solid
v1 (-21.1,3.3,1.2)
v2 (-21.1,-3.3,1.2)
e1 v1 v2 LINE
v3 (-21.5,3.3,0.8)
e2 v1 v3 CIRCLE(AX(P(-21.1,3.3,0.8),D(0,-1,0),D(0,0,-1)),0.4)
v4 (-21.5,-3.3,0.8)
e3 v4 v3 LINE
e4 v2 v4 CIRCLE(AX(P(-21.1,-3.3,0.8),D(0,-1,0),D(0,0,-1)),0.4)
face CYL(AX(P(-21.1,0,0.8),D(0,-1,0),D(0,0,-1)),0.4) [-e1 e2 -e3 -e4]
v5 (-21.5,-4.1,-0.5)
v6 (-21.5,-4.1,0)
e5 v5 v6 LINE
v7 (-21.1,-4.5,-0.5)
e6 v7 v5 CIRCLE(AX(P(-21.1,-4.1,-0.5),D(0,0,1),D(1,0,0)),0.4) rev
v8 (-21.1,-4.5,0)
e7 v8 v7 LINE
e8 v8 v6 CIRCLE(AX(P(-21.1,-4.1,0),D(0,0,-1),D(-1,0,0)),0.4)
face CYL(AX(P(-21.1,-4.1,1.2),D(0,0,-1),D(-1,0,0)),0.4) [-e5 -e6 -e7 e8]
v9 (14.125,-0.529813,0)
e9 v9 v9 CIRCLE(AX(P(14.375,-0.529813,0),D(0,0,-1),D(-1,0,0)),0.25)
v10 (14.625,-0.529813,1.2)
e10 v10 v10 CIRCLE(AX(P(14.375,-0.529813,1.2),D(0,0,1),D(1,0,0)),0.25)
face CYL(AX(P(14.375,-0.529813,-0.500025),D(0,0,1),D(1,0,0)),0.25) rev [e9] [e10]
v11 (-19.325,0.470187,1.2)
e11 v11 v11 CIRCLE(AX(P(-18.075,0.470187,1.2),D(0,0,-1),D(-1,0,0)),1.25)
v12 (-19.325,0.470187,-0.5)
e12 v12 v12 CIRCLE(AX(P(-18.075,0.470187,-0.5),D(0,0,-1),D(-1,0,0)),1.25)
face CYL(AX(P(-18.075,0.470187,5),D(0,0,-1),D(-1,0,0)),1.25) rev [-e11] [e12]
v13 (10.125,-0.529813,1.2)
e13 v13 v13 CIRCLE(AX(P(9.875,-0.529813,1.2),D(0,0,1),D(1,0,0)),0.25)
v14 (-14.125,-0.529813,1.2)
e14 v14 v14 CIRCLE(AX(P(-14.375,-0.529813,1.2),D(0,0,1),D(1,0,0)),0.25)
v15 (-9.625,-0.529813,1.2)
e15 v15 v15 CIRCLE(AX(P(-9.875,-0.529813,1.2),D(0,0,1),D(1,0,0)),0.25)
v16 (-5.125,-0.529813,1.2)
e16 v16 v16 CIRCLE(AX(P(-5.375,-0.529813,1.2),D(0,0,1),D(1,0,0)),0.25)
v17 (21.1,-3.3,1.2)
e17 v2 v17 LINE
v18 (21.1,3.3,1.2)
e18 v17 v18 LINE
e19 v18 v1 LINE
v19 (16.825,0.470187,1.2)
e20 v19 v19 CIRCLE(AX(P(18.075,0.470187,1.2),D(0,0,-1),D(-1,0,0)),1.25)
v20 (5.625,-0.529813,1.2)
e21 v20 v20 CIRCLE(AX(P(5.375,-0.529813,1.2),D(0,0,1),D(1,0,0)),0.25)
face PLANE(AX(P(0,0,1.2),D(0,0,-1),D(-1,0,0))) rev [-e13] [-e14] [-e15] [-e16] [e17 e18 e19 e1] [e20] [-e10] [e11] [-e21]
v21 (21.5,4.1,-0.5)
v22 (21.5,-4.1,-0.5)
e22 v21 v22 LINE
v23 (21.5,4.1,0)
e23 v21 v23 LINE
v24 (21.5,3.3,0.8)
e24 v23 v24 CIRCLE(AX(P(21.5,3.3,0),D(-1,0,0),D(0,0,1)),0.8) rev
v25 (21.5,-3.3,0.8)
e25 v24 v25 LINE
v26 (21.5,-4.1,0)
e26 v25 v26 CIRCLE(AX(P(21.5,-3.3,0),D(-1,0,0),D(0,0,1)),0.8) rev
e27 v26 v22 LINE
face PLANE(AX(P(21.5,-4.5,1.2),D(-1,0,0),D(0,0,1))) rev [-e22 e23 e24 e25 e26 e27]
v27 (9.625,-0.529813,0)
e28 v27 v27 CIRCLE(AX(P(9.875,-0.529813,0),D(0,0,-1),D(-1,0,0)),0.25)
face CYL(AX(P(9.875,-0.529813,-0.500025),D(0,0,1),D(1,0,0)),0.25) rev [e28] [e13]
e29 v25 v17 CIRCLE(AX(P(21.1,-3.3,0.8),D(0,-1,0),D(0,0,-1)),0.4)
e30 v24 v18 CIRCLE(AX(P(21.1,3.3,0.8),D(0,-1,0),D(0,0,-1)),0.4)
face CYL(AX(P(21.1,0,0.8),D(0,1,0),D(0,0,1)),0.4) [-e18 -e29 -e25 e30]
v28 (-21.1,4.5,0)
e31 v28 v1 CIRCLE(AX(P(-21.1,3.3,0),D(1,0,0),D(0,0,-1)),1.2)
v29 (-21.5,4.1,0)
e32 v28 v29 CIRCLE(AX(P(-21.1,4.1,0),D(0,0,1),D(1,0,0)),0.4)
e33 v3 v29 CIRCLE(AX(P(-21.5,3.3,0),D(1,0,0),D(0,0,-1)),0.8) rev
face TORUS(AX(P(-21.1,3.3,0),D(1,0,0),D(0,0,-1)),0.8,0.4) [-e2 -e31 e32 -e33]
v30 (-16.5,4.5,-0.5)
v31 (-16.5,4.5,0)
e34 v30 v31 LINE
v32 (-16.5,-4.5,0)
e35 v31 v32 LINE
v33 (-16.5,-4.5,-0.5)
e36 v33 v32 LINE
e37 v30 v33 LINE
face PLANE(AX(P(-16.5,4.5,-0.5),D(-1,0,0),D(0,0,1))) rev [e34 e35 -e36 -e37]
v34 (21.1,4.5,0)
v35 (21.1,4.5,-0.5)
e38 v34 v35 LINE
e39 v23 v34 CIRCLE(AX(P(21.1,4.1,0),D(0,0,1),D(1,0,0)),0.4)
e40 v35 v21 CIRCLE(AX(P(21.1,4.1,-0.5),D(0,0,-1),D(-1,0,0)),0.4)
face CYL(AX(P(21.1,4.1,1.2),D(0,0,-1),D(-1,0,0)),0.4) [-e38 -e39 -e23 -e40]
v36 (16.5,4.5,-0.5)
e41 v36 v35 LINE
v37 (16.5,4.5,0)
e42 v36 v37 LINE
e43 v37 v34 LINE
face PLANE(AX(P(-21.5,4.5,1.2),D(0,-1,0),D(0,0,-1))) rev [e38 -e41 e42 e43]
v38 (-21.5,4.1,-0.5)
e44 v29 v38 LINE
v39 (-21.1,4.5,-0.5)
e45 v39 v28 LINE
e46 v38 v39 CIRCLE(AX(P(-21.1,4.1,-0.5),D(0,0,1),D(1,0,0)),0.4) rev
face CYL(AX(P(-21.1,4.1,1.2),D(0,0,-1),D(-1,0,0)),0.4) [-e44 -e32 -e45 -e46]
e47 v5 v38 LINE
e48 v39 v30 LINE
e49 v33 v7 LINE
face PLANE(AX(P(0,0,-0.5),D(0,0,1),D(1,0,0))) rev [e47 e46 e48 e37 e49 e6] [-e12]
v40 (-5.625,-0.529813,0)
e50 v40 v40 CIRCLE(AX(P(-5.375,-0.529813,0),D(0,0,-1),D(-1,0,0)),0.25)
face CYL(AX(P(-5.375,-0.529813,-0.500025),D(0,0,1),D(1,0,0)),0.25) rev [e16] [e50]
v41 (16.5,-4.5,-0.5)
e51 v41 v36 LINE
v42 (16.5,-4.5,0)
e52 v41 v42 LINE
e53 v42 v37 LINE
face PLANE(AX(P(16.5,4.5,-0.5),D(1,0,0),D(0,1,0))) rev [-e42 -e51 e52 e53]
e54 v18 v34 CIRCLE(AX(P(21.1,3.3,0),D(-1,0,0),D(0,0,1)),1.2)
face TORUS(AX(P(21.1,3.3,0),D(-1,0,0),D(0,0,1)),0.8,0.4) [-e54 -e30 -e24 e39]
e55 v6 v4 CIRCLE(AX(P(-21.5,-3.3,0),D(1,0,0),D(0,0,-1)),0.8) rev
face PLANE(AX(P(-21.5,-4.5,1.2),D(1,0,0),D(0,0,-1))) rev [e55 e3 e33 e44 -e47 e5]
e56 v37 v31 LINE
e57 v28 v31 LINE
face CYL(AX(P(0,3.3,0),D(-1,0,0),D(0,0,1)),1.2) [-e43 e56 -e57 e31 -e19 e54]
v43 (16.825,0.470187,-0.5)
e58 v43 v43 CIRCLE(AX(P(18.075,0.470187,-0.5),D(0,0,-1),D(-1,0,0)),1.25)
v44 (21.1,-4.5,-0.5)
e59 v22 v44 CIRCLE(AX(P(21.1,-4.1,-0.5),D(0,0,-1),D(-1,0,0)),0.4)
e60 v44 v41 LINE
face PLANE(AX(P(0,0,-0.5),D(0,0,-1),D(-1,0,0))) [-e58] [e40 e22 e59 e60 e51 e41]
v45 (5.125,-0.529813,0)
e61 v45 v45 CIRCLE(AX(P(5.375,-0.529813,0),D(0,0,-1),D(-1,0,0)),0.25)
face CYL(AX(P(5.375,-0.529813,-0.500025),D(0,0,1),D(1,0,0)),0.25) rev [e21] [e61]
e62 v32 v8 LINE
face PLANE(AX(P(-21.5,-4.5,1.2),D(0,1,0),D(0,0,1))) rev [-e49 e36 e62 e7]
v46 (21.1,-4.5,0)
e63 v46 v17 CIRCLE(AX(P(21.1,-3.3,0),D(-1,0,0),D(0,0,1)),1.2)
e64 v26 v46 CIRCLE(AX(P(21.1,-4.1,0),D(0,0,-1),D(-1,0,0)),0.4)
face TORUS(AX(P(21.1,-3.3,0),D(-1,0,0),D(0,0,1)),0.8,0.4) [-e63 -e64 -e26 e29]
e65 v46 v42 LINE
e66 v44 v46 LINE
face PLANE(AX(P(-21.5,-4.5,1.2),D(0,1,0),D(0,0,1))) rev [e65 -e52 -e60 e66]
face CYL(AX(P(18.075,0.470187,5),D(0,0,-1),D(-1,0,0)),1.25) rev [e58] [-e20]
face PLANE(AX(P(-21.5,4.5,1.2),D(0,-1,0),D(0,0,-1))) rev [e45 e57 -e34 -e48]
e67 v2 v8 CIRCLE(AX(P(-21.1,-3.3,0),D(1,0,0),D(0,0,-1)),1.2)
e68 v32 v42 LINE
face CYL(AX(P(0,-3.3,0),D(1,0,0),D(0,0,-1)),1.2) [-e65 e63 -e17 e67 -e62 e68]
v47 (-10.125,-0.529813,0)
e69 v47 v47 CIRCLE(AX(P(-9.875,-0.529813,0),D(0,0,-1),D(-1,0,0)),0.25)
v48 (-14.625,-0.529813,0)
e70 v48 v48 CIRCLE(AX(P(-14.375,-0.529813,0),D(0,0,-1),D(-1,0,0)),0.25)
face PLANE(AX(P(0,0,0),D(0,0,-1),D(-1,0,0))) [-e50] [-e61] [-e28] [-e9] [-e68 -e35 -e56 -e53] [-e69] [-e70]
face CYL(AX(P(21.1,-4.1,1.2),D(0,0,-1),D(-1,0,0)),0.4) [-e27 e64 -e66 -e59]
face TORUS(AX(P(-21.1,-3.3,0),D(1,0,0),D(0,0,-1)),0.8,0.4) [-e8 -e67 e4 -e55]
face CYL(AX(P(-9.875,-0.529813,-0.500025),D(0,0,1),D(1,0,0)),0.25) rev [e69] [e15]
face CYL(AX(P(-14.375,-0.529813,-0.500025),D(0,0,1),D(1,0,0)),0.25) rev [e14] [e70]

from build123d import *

# Parameters (mm, degrees)
ESBO_O1_W                = 43
ESBO_O1_H                = 9
RESSALTO_EXTRUS_O1_DEPTH = 1.2
ESBO_O4_W                = 5
ESBO_O4_H                = 9
RESSALTO_EXTRUS_O4_DEPTH = 0.5
FILETE1_R                = 1.2
FILETE2_R                = 1.2
ESBO_O6_R                = 1.25
CORTE_EXTRUS_O2_DEPTH    = 5.5
FILETE3_R                = 0.4
FILETE4_R                = 0.4
ESBO_O7_R                = 0.25
CORTE_EXTRUS_O3_DEPTH    = 23.031568281


with BuildPart() as part:
    # Esboço1 → Ressalto-extrusão1 (new body)
    with BuildSketch(Plane.XY):
        Rectangle(ESBO_O1_W, ESBO_O1_H)
    extrude(amount=RESSALTO_EXTRUS_O1_DEPTH)

    # Esboço4 → Ressalto-extrusão4 (add)
    with BuildSketch(Plane(origin=(0, 0, 0), x_dir=(-1, 0, 0), z_dir=(0, 0, -1))):
        with Locations((19, 0)):
            Rectangle(ESBO_O4_W, ESBO_O4_H)
        with Locations((-19, 0)):
            Rectangle(ESBO_O4_W, ESBO_O4_H)
    extrude(amount=RESSALTO_EXTRUS_O4_DEPTH)

    # Filete1
    filete1_edges = [part.edges().sort_by_distance(p)[0] for p in [
        (0, 4.5, 1.2),
    ]]
    fillet(filete1_edges, radius=FILETE1_R - 0.0001)  # a hair under: the kernel refuses the full size

    # Filete2
    filete2_edges = [part.edges().sort_by_distance(p)[0] for p in [
        (0, -4.5, 1.2),
    ]]
    fillet(filete2_edges, radius=FILETE2_R - 0.0001)  # a hair under: the kernel refuses the full size

    # Esboço6 → Corte-extrusão2 (cut)
    with BuildSketch(Plane(origin=(0, 0, -0.5), x_dir=(-1, 0, 0), z_dir=(0, 0, -1))):
        with Locations((-18.075, 0.470186795)):
            Circle(ESBO_O6_R)
        with Locations((18.075, 0.470186795)):
            Circle(ESBO_O6_R)
    extrude(amount=-CORTE_EXTRUS_O2_DEPTH, mode=Mode.SUBTRACT)

    # Filete3
    filete3_edges = [part.edges().sort_by_distance(p)[0] for p in [
        (-21.5, 0, 1.2),
        (-21.5, 4.5, -0.24995),
        (-21.5, 4.148557427, 0.848557427),
        (-21.5, -4.5, -0.24995),
        (-21.5, -4.148557427, 0.848557427),
    ]]
    fillet(filete3_edges, radius=FILETE3_R)

    # Filete4
    filete4_edges = [part.edges().sort_by_distance(p)[0] for p in [
        (21.5, 4.5, -0.24995),
        (21.5, 4.148557427, 0.848557427),
        (21.5, 0, 1.2),
        (21.5, -4.5, -0.24995),
        (21.5, -4.148557427, 0.848557427),
    ]]
    fillet(filete4_edges, radius=FILETE4_R)

    # Esboço7 → Corte-extrusão3 (cut, through all)
    with BuildSketch(Plane.XY.offset(1.2)):
        with Locations((14.375, -0.529813205)):
            Circle(ESBO_O7_R)
        with Locations((-14.375, -0.529813205)):
            Circle(ESBO_O7_R)
        with Locations((-9.875, -0.529813205)):
            Circle(ESBO_O7_R)
        with Locations((-5.375, -0.529813205)):
            Circle(ESBO_O7_R)
        with Locations((9.875, -0.529813205)):
            Circle(ESBO_O7_R)
        with Locations((5.375, -0.529813205)):
            Circle(ESBO_O7_R)
    extrude(amount=-CORTE_EXTRUS_O3_DEPTH, mode=Mode.SUBTRACT)


solid = part.part
